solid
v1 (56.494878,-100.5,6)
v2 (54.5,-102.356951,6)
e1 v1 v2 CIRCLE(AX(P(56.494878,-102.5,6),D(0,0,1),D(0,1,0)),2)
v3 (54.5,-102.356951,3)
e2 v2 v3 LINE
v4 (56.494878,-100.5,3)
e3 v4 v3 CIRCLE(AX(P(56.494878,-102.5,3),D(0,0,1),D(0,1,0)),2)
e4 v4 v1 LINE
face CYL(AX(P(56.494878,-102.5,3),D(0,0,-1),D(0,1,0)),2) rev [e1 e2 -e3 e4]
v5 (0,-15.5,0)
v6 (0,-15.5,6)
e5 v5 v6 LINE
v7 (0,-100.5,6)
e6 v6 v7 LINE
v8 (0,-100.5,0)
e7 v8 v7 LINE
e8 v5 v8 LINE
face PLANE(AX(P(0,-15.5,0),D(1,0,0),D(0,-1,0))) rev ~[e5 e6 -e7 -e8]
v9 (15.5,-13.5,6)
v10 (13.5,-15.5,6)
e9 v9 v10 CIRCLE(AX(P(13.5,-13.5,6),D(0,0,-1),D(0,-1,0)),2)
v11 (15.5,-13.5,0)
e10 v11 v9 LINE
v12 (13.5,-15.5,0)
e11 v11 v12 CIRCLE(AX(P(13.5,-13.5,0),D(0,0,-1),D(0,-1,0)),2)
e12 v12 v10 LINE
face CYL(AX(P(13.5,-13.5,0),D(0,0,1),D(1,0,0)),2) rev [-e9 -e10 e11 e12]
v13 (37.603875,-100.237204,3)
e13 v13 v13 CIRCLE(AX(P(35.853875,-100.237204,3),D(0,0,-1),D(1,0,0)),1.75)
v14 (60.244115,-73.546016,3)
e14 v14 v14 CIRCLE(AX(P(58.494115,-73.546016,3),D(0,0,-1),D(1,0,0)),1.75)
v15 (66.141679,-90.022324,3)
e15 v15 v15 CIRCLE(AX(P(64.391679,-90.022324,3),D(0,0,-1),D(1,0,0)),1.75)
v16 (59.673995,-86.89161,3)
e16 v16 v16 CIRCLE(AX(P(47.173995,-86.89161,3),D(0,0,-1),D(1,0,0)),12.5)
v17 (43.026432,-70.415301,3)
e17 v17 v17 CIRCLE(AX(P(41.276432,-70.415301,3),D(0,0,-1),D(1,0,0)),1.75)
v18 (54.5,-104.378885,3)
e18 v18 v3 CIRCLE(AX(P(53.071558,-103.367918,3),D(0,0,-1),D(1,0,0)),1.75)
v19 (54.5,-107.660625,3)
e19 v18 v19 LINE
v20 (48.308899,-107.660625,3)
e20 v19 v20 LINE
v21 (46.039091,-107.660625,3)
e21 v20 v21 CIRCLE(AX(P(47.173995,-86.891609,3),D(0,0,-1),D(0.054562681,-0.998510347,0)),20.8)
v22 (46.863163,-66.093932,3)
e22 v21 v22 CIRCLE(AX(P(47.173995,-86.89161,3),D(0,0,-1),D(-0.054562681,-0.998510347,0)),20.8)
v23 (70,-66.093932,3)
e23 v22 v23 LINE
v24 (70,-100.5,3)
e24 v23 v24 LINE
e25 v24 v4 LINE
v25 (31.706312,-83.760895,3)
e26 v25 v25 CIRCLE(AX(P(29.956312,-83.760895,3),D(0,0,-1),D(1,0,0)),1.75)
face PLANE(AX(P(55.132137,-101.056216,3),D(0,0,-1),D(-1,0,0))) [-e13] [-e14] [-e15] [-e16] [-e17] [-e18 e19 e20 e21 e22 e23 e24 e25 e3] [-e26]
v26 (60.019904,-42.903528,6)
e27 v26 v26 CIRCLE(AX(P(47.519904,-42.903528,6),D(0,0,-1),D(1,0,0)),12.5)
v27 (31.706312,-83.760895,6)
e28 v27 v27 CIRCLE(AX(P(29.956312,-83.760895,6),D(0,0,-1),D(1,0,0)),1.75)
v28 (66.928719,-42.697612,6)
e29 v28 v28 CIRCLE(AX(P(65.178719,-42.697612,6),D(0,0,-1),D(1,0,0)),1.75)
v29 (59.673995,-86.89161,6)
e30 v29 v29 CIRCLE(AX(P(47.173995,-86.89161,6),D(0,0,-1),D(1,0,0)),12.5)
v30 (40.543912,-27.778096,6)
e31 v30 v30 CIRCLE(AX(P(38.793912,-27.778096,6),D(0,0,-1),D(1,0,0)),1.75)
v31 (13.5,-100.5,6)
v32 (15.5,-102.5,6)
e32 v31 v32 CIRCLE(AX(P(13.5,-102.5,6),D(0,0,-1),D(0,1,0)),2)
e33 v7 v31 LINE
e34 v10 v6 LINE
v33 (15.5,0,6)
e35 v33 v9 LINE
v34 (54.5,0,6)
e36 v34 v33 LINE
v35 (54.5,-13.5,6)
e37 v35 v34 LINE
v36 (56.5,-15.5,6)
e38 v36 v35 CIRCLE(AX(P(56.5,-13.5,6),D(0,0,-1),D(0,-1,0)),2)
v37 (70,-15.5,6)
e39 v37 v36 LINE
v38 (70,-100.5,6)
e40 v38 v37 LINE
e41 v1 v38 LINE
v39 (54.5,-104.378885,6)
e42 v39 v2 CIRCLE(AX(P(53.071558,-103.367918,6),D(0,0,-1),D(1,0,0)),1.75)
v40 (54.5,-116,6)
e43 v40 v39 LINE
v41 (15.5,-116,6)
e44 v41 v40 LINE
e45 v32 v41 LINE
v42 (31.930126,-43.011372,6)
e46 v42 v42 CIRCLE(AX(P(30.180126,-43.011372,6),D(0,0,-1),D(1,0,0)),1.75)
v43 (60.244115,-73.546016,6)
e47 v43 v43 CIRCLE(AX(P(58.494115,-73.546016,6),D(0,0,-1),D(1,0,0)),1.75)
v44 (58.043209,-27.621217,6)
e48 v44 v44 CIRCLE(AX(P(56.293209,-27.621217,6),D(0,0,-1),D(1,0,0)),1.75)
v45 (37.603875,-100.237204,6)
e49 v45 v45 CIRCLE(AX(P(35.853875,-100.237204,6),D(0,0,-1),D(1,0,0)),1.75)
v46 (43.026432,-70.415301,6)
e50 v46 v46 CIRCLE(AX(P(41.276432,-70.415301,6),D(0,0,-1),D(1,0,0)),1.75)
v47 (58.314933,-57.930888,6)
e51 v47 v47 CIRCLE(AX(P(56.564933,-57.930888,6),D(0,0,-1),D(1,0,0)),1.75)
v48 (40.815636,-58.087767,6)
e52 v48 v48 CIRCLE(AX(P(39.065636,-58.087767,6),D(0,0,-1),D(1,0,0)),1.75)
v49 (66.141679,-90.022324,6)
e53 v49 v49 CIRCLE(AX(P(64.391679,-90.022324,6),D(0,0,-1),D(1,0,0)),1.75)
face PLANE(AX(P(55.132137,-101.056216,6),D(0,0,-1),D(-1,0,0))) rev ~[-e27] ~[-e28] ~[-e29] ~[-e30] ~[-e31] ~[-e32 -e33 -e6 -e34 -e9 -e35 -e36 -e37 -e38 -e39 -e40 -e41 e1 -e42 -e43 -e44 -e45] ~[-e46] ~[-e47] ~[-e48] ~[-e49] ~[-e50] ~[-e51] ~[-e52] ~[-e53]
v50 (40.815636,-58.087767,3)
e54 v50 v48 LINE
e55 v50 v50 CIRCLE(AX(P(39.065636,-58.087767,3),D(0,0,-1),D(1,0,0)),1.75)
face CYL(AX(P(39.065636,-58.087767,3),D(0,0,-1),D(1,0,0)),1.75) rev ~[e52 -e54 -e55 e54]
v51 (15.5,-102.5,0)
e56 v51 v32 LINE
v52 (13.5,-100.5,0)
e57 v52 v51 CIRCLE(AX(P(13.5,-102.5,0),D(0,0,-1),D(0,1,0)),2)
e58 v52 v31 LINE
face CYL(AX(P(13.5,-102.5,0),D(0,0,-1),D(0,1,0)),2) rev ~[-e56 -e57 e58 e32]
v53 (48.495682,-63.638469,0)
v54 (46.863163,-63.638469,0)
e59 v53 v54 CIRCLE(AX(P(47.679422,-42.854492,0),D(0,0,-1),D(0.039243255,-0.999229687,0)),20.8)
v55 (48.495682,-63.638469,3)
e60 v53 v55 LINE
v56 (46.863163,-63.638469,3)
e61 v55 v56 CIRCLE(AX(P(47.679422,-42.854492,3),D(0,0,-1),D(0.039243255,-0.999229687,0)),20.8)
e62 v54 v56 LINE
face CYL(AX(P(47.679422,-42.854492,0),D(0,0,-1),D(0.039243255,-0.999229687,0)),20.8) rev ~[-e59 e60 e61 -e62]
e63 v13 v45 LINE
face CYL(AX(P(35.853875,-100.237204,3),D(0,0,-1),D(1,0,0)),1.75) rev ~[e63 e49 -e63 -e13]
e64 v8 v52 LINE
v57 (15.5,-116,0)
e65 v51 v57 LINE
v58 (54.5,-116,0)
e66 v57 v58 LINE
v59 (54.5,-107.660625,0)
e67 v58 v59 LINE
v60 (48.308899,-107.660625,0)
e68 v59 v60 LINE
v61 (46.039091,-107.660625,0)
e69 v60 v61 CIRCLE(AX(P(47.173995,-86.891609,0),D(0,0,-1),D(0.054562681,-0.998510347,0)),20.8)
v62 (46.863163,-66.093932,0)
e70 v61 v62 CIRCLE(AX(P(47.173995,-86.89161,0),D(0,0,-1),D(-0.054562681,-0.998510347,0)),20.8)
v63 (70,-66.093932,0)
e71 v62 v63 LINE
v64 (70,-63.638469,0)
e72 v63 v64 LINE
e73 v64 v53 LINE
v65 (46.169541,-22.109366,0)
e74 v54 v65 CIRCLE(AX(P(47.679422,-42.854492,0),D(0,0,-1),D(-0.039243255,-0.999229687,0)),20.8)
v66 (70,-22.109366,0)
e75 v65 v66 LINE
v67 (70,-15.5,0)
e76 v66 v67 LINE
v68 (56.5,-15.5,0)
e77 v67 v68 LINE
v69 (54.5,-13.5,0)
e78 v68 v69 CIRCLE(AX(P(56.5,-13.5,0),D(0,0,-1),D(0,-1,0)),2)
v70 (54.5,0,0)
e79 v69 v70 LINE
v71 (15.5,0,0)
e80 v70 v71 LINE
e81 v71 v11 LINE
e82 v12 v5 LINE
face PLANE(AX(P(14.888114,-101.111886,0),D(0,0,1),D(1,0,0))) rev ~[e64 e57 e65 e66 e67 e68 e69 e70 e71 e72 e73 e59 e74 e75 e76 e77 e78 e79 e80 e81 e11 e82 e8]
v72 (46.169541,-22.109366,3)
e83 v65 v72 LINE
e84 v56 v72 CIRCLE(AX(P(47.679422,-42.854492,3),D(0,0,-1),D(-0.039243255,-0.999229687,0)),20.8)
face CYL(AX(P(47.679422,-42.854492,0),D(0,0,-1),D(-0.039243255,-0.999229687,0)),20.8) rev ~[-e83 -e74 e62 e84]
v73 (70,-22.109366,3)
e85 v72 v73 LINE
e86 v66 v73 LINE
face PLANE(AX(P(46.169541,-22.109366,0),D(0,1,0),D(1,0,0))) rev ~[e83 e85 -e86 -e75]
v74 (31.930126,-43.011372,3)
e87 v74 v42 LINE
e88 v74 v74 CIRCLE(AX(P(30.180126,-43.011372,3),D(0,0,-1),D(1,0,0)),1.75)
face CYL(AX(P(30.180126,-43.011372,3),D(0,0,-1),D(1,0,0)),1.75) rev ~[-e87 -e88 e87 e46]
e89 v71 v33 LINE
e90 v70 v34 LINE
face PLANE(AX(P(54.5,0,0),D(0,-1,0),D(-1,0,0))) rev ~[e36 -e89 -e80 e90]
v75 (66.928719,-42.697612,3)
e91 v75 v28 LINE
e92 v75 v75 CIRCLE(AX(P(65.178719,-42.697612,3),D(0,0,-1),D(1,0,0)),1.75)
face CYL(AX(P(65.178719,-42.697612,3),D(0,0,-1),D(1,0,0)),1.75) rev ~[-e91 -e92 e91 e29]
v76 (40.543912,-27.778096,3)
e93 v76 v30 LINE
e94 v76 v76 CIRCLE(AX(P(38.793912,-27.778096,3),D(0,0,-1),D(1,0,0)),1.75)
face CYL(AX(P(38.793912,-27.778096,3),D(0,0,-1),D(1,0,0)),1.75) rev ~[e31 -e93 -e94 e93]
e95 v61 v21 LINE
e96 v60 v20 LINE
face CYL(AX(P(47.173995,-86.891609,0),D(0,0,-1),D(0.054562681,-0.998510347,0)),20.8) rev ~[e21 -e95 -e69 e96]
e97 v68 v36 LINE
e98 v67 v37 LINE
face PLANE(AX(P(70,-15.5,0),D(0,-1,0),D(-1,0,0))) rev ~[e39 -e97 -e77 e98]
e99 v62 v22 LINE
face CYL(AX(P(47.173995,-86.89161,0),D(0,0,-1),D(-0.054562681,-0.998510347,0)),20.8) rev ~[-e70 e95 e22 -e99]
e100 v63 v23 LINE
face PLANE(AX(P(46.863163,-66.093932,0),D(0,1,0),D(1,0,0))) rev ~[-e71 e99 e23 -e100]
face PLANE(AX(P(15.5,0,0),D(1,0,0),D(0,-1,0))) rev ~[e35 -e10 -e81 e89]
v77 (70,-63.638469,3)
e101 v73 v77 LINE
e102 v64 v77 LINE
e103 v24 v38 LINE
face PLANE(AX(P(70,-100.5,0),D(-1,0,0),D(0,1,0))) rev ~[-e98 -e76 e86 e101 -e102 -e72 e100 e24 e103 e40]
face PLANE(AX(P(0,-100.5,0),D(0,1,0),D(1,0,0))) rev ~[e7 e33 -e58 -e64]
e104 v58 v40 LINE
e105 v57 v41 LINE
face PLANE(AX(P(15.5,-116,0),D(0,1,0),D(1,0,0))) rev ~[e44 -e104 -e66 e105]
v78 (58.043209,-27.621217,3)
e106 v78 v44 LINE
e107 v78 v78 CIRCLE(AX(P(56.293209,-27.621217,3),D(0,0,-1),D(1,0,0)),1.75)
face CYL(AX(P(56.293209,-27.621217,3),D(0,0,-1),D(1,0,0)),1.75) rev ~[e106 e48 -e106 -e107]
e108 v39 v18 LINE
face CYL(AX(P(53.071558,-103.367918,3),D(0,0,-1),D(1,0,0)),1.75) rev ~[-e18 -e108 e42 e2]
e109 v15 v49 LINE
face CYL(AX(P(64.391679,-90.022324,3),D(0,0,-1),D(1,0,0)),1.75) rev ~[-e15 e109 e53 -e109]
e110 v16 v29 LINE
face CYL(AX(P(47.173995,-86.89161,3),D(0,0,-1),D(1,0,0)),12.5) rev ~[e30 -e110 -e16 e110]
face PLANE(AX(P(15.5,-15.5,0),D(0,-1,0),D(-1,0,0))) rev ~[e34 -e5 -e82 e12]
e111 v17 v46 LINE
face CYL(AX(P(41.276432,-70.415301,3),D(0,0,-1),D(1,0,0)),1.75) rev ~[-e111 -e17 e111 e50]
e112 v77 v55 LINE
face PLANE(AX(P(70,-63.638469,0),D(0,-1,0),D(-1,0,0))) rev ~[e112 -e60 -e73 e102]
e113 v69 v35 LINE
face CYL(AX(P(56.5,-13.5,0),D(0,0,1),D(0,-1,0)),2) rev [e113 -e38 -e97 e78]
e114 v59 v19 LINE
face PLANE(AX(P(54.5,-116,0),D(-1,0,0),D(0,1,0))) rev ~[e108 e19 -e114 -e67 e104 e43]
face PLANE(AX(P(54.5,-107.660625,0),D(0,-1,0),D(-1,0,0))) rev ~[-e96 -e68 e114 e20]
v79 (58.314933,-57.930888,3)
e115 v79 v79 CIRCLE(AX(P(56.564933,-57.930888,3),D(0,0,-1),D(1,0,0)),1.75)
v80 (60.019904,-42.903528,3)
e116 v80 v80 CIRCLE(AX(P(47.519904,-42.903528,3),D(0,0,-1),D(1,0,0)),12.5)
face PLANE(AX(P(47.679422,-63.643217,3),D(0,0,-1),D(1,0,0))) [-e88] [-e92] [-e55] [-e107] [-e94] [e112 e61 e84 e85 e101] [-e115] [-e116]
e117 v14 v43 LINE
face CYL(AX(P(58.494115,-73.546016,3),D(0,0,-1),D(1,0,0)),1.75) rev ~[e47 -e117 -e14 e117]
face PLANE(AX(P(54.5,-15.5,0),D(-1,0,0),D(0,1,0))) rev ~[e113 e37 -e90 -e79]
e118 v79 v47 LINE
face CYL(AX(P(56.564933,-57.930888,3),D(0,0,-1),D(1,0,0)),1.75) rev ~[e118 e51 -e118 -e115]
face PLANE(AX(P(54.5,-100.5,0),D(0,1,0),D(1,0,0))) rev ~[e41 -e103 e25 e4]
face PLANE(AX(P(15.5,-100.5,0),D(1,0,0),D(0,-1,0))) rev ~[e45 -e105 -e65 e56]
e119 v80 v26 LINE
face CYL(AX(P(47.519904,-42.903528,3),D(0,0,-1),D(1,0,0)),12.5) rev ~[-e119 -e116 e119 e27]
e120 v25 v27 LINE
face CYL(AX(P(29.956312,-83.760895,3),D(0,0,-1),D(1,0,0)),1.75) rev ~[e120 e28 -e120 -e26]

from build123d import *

# Parameters (mm, degrees)
F1_DEPTH     = 6
F3_DEPTH     = 3
F4_R         = 12.5
F5_DEPTH     = 25
F6_R         = 1.75
F7_DEPTH     = 25
F8_R         = 1.75
F9_DEPTH     = 25
F10_T1_DEPTH = 6
F10_T3_DEPTH = 3
F11_R        = 2


# Not quite as in the source:
# - a fillet or chamfer that OpenCascade refuses, or shapes differently, is made with other operations: its cross-section is extruded or revolved along the edge and cut away or added


with BuildPart() as f1:
    # F0 (on Top) → F1 (new body)
    with BuildSketch(Plane.XY):
        Polygon((15.5, -15.5), (0, -15.5), (0, -100.5), (15.5, -100.5), (15.5, -116), (54.5, -116), (54.5, -100.5), (70, -100.5), (70, -15.5), (54.5, -15.5), (54.5, 0), (15.5, 0), align=None)
    extrude(amount=F1_DEPTH)

    # F2 (on face) → F3 (cut)
    with BuildSketch(Plane(origin=(0, 0, 0), x_dir=(1, 0, 0), z_dir=(0, 0, -1))):
        with BuildLine():
            Line((46.0390912639, 107.6606247352), (48.3088987836, 107.6606247352))
            ThreePointArc((48.3088987836, 107.6606247352), (47.1739950237, 107.6916095092), (46.0390912639, 107.6606247352))
        make_face()
        with BuildLine():
            Line((46.863162711, 63.6384694919), (48.4956821186, 63.6384694919))
            ThreePointArc((48.4956821186, 63.6384694919), (47.6794224148, 63.6544920069), (46.863162711, 63.6384694919))
        make_face()
        with BuildLine():
            Line((54.5, 107.6606247352), (48.3088987836, 107.6606247352))
            Line((48.3088987836, 107.6606247352), (46.0390912639, 107.6606247352))
            ThreePointArc((46.0390912639, 107.6606247352), (26.3780814544, 86.4793246358), (46.863162711, 66.0939321564))
            Line((46.863162711, 66.0939321564), (70, 66.0939321564))
            Line((70, 66.0939321564), (70, 100.5))
            Line((70, 100.5), (54.5, 100.5))
            Line((54.5, 100.5), (54.5, 107.6606247352))
        make_face()
        with BuildLine():
            Line((70, 22.1093658845), (70, 63.6384694919))
            Line((70, 63.6384694919), (48.4956821186, 63.6384694919))
            Line((48.4956821186, 63.6384694919), (46.863162711, 63.6384694919))
            ThreePointArc((46.863162711, 63.6384694919), (26.8823229814, 43.2018465212), (46.1695409076, 22.1093658845))
            Line((46.1695409076, 22.1093658845), (70, 22.1093658845))
        make_face()
    extrude(amount=-F3_DEPTH, mode=Mode.SUBTRACT)

    # F4 (on face) → F5 (cut)
    with BuildSketch(Plane(origin=(0, 0, 3), x_dir=(1, 0, 0), z_dir=(0, 0, -1))):
        with Locations((47.51990363, 42.9035276175)):
            Circle(F4_R)
        with Locations((47.1739950237, 86.8916095092)):
            Circle(F4_R)
    extrude(amount=-F5_DEPTH, mode=Mode.SUBTRACT)

    # F6 (on face) → F7 (cut)
    with BuildSketch(Plane(origin=(0, 0, 3), x_dir=(1, 0, 0), z_dir=(0, 0, -1))):
        with Locations((39.0656358559, 58.0877674629)):
            Circle(F6_R)
        with Locations((30.1801256076, 43.0113717521)):
            Circle(F6_R)
        with Locations((38.7939121665, 27.7780962961)):
            Circle(F6_R)
        with Locations((56.2932089737, 27.6212165509)):
            Circle(F6_R)
        with Locations((65.178719222, 42.6976122617)):
            Circle(F6_R)
        with Locations((56.5649326631, 57.9308877176)):
            Circle(F6_R)
    extrude(amount=-F7_DEPTH, mode=Mode.SUBTRACT)

    # F8 (on face) → F9 (cut)
    with BuildSketch(Plane(origin=(0, 0, 3), x_dir=(1, 0, 0), z_dir=(0, 0, -1))):
        with Locations((35.8538748382, 100.2372035006)):
            Circle(F8_R)
        with Locations((29.9563115058, 83.7608948503)):
            Circle(F8_R)
        with Locations((41.2764316914, 70.4153008589)):
            Circle(F8_R)
        with Locations((58.4941152093, 73.5460155178)):
            Circle(F8_R)
        with Locations((64.3916785417, 90.0223241681)):
            Circle(F8_R)
        with Locations((53.0715583561, 103.3679181595)):
            Circle(F8_R)
    extrude(amount=-F9_DEPTH, mode=Mode.SUBTRACT)

    # F10: fillet of radius 2 on 2 edges, made by hand

    # F10_s2 → F10_t1 (join)
    with BuildSketch(Plane.XY):
        with BuildLine():
            ThreePointArc((13.5, -100.5), (14.9142135624, -101.0857864376), (15.5, -102.5))
            Line((15.5, -102.5), (15.5, -100.5))
            Line((15.5, -100.5), (13.5, -100.5))
        make_face()
    extrude(amount=F10_T1_DEPTH)

    # F10_s4 → F10_t3 (join)
    with BuildSketch(Plane.XY.offset(3)):
        with BuildLine():
            ThreePointArc((56.4948776909, -100.5), (55.1321777741, -101.0360843819), (54.5, -102.3569510631))
            Line((54.5, -102.3569510631), (54.5, -100.5))
            Line((54.5, -100.5), (56.4948776909, -100.5))
        make_face()
    extrude(amount=F10_T3_DEPTH)

    # F11
    f11_edges = [f1.edges().sort_by_distance(p)[0] for p in [
        (54.5, -15.5, 3),
        (15.5, -15.5, 3),
    ]]
    fillet(f11_edges, radius=F11_R)


solid = f1.part
